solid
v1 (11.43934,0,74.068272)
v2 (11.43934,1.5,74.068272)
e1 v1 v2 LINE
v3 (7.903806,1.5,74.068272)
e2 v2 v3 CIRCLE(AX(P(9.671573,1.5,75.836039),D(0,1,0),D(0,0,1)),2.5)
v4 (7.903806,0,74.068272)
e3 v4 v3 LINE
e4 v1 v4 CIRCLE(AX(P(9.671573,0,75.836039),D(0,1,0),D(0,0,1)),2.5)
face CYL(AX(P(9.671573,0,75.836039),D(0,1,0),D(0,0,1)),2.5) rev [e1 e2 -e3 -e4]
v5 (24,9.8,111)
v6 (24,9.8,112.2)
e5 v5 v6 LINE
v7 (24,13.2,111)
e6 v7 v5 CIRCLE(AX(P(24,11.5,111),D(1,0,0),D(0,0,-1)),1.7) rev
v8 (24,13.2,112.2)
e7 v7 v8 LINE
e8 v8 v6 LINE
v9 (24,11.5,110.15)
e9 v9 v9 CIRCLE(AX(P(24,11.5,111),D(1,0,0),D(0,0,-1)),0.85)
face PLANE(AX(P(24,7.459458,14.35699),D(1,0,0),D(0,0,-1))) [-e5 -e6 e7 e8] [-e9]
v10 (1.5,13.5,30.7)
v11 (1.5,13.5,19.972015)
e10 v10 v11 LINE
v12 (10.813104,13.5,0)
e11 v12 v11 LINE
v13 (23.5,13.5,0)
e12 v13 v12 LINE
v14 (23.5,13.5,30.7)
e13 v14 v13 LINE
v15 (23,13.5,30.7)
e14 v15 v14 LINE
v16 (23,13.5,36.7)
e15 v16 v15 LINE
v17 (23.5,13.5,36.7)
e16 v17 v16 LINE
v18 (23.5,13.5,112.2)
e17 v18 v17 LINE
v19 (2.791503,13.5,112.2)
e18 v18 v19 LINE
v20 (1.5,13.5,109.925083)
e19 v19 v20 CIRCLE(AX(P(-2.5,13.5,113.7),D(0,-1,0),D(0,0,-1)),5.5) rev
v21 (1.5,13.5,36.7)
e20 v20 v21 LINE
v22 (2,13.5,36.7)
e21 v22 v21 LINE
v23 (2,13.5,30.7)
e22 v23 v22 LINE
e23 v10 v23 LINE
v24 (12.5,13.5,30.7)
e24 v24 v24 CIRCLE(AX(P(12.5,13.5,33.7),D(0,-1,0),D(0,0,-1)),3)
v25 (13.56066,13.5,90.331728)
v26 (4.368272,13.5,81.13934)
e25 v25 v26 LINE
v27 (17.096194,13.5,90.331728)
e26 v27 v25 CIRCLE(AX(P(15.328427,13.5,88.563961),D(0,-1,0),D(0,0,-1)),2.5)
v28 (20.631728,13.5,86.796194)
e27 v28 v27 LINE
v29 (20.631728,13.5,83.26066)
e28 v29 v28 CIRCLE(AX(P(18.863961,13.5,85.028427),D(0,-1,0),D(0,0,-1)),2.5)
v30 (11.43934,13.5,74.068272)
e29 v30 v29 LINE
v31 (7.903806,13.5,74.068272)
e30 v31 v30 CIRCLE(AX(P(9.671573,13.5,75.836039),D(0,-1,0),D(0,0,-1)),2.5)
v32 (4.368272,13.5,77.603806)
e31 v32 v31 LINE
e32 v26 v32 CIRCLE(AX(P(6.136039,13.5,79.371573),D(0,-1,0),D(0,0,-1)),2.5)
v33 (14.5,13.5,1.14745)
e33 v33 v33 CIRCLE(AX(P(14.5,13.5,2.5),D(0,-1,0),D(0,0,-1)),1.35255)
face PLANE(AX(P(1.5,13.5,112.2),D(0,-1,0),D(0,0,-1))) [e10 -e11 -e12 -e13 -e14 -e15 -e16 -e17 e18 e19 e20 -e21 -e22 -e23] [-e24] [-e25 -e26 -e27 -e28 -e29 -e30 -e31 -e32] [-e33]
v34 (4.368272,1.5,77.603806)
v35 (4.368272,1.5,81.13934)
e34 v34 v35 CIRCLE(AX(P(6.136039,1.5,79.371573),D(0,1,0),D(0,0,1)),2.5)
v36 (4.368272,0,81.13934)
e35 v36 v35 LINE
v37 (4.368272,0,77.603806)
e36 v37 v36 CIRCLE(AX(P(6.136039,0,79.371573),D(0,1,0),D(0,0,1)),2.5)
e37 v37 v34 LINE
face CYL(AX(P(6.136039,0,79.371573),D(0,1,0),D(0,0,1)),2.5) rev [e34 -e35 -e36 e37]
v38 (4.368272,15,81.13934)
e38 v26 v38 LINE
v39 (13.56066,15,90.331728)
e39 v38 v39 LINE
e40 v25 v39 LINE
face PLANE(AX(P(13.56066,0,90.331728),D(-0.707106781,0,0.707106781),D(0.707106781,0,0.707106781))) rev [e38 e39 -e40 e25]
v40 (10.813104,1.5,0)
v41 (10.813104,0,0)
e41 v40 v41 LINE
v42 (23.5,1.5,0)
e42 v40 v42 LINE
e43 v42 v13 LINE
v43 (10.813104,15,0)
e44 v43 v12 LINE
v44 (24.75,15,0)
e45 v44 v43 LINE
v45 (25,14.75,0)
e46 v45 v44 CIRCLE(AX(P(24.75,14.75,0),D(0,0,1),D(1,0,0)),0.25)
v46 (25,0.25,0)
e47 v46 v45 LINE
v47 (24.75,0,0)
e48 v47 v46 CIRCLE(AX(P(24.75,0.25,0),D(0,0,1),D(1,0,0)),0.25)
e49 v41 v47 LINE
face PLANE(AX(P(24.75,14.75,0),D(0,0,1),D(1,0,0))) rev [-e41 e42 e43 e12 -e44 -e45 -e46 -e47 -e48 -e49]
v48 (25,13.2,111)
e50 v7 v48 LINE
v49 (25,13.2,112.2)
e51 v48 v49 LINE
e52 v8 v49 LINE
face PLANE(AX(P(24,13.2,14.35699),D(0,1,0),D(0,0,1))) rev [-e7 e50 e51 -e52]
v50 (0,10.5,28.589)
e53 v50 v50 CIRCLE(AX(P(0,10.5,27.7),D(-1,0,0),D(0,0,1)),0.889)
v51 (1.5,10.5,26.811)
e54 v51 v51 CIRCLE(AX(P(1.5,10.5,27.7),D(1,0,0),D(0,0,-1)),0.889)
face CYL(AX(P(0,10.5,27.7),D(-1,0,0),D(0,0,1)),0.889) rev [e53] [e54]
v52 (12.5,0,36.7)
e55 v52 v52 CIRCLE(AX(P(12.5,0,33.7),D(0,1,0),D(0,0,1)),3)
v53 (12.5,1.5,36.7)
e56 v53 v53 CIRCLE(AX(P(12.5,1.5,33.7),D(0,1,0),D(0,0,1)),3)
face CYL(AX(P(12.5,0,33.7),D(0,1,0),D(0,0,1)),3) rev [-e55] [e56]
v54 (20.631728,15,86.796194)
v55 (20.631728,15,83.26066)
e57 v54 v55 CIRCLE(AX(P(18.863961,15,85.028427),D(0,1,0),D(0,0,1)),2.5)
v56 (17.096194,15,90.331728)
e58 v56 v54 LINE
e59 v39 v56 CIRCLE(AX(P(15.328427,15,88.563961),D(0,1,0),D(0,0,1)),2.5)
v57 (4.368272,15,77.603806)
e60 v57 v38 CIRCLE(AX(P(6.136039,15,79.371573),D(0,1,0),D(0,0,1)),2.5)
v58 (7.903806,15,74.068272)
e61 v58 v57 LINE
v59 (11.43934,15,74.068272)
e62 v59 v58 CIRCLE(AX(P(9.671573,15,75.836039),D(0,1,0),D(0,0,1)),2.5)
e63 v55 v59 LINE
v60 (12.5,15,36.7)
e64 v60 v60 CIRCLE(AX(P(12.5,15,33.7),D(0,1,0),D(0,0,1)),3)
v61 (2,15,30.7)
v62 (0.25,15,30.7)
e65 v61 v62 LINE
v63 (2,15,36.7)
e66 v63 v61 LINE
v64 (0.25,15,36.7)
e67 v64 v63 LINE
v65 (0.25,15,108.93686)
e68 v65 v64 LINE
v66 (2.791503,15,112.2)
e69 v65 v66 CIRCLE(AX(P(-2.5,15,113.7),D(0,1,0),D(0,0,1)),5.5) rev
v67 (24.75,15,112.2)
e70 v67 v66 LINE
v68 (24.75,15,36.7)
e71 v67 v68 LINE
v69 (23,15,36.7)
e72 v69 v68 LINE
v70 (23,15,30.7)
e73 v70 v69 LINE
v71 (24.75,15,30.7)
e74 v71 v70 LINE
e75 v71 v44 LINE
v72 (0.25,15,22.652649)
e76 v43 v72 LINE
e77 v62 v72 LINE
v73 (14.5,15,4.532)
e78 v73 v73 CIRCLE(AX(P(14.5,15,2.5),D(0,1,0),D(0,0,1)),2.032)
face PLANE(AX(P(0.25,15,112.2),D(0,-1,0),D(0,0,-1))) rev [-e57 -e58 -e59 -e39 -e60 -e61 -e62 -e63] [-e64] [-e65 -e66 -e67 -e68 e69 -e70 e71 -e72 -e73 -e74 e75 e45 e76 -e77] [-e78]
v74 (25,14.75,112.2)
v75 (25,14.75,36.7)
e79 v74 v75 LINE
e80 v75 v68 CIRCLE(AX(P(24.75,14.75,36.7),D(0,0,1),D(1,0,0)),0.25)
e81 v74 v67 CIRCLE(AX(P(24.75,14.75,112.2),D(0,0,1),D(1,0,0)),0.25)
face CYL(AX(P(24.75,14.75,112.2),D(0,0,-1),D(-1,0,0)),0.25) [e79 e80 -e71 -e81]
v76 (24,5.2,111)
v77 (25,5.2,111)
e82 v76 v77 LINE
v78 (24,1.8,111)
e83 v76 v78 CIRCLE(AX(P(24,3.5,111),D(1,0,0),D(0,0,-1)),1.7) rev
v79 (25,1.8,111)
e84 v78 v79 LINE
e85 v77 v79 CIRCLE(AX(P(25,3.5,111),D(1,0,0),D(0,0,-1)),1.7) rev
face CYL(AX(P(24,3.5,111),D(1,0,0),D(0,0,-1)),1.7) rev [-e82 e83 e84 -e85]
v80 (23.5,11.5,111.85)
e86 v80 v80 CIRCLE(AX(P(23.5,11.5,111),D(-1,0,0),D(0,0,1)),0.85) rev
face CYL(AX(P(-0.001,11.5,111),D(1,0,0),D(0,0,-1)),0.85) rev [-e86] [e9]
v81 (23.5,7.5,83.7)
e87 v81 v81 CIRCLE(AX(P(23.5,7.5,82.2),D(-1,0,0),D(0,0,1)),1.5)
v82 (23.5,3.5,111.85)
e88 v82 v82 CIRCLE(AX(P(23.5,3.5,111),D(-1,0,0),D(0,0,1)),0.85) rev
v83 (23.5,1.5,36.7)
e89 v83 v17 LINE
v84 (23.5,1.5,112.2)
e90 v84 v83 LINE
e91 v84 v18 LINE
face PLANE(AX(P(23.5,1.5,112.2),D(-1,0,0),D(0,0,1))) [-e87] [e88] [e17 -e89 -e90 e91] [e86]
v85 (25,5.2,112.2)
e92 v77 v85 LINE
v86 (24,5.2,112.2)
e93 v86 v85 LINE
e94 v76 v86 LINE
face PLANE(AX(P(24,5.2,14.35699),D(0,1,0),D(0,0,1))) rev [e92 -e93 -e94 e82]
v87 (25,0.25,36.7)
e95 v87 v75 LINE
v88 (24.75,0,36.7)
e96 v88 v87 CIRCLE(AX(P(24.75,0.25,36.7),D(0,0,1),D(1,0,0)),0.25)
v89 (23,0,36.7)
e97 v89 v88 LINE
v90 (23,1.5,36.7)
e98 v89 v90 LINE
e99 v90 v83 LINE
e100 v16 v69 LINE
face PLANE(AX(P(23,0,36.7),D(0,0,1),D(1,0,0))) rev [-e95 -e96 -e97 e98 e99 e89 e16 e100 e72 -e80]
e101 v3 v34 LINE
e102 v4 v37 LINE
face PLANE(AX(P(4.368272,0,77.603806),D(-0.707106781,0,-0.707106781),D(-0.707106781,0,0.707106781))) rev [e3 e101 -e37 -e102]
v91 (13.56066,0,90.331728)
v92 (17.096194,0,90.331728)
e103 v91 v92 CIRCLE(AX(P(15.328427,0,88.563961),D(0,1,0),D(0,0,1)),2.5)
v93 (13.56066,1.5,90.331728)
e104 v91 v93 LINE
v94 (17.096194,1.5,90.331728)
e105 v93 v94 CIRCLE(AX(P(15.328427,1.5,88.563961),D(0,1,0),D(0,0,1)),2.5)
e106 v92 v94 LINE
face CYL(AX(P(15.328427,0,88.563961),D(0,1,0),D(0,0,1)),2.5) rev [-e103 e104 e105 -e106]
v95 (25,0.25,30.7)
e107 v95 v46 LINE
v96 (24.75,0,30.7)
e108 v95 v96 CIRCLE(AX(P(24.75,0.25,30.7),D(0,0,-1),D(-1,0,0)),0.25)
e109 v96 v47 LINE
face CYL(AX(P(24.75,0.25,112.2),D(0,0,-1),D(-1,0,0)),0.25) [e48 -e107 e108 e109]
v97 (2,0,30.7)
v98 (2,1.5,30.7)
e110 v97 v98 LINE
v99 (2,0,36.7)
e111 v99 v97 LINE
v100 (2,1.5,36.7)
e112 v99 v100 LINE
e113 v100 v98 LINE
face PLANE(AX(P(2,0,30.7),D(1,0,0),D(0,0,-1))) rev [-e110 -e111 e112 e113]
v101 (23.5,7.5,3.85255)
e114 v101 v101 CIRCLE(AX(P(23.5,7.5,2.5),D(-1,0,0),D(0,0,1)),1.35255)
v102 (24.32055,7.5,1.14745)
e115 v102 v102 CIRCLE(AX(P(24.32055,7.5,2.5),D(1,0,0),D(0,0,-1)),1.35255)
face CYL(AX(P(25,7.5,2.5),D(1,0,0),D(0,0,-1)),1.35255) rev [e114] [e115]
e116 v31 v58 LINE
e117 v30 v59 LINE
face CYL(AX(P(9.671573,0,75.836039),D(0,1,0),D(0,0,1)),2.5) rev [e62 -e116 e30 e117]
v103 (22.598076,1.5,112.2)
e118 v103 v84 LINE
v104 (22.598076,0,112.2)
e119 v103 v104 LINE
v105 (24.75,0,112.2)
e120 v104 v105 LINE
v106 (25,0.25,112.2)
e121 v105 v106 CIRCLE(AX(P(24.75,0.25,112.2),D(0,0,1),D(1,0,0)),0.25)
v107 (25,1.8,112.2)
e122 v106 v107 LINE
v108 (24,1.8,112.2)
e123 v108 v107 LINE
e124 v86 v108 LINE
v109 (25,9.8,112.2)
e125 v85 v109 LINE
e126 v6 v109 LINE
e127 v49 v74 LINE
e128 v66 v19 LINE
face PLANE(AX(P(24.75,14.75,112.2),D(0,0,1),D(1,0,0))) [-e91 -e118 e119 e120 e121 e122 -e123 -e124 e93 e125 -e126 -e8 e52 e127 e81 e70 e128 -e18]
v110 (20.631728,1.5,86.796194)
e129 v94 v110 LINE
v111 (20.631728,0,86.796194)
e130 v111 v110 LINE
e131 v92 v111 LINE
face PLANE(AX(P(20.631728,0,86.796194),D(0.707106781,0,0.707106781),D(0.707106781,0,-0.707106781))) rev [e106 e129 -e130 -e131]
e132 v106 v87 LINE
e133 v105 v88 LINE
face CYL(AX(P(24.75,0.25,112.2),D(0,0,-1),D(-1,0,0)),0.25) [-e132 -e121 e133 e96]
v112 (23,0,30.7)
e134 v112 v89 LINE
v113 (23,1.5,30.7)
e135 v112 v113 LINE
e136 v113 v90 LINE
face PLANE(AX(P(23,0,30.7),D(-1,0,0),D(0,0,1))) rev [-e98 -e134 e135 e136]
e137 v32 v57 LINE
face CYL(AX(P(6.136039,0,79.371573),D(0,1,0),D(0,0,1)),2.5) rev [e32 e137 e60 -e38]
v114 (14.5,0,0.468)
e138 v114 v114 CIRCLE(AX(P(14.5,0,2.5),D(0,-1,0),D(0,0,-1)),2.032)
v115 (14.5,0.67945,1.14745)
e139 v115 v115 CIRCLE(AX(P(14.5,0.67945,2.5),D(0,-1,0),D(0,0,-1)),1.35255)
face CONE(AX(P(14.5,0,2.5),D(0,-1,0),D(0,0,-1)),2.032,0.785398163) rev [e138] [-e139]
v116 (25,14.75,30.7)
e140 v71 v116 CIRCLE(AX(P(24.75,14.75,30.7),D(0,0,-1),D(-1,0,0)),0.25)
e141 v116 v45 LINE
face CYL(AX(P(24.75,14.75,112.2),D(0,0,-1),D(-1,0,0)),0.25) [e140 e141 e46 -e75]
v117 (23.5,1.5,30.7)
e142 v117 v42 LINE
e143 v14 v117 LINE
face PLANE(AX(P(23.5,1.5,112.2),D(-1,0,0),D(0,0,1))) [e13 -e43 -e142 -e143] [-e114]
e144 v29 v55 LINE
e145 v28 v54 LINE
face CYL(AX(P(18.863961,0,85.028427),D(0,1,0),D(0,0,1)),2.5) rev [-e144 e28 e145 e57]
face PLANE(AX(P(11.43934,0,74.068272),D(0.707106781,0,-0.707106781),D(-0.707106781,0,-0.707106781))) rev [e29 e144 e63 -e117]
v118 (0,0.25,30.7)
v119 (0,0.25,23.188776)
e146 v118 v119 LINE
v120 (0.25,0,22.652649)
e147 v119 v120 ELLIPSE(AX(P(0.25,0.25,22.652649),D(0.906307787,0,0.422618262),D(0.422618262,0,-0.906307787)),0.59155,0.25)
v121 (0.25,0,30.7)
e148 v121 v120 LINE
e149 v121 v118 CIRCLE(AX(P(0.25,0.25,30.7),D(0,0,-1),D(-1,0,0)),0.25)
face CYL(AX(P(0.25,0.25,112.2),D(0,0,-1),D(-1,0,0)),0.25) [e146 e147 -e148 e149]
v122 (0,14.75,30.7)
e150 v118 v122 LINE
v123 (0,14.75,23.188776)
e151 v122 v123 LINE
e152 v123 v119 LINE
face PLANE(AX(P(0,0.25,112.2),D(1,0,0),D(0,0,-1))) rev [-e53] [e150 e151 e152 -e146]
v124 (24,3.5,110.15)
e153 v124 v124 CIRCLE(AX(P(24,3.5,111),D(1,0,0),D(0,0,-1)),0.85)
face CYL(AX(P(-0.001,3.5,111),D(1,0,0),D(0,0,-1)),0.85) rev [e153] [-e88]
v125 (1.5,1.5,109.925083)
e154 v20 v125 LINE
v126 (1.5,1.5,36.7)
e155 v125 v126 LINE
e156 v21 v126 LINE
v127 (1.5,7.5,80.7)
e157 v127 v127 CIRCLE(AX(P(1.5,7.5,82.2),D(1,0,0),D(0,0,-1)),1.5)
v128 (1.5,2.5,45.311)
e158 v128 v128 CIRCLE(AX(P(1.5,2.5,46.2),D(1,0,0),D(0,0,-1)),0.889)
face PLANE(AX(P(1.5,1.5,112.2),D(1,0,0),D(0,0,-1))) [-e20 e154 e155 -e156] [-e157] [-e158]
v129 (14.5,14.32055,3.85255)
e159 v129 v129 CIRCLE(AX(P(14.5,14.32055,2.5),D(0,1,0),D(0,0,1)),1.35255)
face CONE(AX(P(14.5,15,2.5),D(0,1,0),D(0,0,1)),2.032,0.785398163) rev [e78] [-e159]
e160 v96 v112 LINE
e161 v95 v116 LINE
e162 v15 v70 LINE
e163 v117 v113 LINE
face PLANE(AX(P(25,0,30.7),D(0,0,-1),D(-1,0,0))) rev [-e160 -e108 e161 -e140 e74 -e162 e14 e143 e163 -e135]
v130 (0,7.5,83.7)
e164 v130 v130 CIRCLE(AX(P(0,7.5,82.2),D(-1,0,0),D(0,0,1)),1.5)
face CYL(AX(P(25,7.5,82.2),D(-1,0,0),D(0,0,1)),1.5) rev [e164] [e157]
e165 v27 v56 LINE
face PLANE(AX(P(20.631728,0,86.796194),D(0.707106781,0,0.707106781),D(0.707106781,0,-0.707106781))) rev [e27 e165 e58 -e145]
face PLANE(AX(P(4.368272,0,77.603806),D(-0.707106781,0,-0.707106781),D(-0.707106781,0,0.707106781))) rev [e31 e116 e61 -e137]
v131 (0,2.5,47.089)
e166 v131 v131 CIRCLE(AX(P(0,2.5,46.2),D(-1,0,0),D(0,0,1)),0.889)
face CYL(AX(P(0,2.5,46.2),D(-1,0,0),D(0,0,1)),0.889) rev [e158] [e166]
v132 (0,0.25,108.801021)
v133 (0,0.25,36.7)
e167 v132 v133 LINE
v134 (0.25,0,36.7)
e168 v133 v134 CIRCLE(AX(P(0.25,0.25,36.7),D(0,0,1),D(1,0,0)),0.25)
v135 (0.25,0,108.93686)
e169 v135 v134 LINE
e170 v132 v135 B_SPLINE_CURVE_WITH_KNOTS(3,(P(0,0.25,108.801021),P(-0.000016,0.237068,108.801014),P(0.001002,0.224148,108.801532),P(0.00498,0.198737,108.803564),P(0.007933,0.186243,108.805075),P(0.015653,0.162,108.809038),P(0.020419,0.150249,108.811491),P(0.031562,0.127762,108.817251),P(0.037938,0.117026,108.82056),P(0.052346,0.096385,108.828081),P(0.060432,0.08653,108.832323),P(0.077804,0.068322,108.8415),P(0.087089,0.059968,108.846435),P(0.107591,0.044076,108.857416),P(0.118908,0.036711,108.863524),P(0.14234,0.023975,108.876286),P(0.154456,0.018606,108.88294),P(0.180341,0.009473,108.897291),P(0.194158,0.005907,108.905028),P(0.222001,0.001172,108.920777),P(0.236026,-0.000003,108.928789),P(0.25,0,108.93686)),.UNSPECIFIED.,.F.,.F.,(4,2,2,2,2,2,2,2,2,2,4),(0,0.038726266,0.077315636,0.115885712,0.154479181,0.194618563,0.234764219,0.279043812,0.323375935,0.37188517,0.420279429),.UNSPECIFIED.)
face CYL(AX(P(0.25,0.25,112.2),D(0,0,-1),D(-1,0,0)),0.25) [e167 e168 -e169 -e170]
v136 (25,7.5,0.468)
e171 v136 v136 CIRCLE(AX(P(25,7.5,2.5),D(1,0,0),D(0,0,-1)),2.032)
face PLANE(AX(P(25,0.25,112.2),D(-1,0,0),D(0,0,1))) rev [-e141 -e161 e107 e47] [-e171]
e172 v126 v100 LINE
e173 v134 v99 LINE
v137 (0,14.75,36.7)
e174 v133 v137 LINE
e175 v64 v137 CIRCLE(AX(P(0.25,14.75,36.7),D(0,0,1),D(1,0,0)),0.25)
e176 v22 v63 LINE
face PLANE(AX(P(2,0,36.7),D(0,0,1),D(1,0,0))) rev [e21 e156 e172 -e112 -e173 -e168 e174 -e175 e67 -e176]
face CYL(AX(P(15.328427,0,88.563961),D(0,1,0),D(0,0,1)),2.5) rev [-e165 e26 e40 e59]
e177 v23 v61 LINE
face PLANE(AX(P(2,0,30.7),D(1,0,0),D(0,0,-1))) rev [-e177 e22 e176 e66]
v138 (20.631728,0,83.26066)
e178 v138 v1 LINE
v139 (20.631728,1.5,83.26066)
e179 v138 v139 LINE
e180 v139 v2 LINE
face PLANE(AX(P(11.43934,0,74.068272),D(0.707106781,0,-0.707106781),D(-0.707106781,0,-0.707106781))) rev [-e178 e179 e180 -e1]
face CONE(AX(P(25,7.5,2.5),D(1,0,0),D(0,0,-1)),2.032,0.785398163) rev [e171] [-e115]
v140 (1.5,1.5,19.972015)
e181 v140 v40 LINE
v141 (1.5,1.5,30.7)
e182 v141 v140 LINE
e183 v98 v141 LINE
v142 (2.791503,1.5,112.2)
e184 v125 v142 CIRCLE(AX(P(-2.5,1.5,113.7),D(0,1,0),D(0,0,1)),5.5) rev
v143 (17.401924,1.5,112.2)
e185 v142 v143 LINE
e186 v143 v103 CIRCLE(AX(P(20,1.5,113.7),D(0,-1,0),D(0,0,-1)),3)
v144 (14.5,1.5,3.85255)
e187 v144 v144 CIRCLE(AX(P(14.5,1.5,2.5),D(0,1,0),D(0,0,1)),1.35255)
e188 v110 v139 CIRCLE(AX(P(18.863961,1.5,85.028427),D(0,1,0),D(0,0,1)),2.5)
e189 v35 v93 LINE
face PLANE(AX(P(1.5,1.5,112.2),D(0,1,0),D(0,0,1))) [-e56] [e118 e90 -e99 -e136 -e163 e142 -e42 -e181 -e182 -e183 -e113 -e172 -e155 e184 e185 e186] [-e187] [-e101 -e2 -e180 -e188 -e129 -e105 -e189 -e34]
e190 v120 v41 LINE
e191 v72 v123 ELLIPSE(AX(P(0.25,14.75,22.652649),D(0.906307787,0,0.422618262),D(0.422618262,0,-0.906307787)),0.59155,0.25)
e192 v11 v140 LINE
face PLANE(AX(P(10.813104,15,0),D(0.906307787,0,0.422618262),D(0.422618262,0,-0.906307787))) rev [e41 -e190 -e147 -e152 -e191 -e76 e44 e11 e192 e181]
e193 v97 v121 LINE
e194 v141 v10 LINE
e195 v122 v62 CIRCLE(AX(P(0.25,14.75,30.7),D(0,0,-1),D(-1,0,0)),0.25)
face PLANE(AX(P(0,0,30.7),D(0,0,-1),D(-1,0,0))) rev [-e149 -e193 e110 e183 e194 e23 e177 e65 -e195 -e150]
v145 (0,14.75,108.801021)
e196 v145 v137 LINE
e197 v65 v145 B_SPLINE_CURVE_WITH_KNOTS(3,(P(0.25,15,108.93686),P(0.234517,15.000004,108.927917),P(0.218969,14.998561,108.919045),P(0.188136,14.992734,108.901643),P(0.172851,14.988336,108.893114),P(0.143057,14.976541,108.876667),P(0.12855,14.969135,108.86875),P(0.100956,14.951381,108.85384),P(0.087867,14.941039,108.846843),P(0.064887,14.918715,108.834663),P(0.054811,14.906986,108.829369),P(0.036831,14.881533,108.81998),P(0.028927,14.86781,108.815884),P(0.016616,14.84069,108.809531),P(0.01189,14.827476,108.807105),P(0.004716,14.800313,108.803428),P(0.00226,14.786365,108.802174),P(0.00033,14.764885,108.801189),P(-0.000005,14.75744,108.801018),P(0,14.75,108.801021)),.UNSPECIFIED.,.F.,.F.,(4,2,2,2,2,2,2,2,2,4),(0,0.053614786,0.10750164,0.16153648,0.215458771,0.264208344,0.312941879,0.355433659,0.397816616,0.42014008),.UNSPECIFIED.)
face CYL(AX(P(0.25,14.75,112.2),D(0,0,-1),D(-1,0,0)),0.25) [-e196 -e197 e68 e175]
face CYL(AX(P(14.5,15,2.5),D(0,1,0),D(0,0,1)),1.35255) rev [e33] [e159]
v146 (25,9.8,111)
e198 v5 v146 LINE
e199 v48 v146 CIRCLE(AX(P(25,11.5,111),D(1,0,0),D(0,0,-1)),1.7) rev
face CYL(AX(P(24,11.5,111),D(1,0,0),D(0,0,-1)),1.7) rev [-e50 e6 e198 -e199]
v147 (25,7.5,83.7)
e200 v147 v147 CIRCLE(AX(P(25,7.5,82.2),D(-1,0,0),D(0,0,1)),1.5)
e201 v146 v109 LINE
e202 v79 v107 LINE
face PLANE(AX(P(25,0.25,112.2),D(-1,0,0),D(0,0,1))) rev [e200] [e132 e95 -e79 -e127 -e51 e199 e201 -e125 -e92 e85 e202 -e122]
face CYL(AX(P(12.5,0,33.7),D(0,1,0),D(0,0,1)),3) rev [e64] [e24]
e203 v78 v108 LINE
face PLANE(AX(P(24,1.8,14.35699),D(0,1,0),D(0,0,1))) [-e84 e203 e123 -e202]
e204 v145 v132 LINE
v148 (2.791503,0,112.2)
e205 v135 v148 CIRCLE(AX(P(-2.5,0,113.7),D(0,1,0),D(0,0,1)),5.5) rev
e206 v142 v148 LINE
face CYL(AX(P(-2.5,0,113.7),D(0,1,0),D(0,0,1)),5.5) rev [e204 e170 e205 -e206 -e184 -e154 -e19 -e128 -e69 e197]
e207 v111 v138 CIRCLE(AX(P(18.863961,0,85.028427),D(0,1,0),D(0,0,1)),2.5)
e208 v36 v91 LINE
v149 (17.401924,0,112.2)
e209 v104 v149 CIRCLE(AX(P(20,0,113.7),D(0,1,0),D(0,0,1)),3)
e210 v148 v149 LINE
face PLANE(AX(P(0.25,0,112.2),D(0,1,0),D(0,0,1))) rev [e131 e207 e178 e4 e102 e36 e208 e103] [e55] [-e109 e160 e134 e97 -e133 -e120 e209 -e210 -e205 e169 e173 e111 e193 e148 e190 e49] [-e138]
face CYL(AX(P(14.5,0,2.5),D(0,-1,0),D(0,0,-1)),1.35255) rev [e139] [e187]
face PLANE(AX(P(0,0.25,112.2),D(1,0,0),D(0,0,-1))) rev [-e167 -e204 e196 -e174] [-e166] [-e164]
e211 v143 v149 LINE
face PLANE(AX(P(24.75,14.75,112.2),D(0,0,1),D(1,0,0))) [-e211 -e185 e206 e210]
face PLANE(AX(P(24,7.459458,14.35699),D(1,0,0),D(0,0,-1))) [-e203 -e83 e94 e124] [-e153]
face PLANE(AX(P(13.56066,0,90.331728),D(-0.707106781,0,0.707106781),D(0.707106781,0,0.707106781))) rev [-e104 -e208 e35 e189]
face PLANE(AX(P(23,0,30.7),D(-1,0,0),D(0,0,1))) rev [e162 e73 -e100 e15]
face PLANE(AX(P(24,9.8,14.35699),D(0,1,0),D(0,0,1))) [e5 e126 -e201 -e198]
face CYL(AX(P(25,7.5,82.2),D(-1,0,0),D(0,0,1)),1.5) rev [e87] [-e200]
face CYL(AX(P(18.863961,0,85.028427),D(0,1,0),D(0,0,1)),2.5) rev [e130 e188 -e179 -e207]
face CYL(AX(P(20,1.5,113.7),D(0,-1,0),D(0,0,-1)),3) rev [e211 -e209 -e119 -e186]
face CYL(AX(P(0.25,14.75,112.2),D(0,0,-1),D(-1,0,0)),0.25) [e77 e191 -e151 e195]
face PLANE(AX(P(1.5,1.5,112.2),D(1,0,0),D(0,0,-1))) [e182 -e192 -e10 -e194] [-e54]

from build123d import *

# Parameters (mm, degrees)
SKETCH_1_W              = 22
SKETCH_1_H              = 12
EXTRUDE_1_DEPTH         = 112.2
SKETCH_2_R              = 3
SKETCH_2_W              = 2
SKETCH_2_H              = 6
CUT_EXTRUDE_1_DEPTH     = 116.926010886
SKETCH_3_R              = 1.5
CUT_EXTRUDE_2_DEPTH     = 116.926010886
CUT_EXTRUDE_5_DEPTH     = 116.926010886
HOLE_WIZARD_2_561_D     = 1.778
HOLE_WIZARD_2_561_DEPTH = 1.5
CUT_EXTRUDE_7_DEPTH     = 116.926010886
CUT_EXTRUDE_8_REACH     = 117.926
SKETCH_13_R             = 0.85
CUT_EXTRUDE_START       = 24
CUT_EXTRUDE_9_OUTLINE_R = 0.85
CUT_EXTRUDE_9_DEPTH     = 1
CUT_EXTRUDE_10_DEPTH    = 116.74147918


# Read off the part's stored shape, not the designer's step: Вырез-Вытянуть9
with BuildPart() as part:
    # Эскиз1 → Вытянуть1 (new body)
    with BuildSketch(Plane.XY):
        with BuildLine():
            Line((0.25, 0), (24.75, 0))
            ThreePointArc((24.75, 0), (24.926776695, 0.073223305), (25, 0.25))
            Line((25, 0.25), (25, 14.75))
            ThreePointArc((25, 14.75), (24.926776695, 14.926776695), (24.75, 15))
            Line((24.75, 15), (0.25, 15))
            ThreePointArc((0.25, 15), (0.073223305, 14.926776695), (0, 14.75))
            Line((0, 14.75), (0, 0.25))
            ThreePointArc((0, 0.25), (0.073223305, 0.073223305), (0.25, 0))
        make_face()
        with Locations((12.5, 7.5)):
            Rectangle(SKETCH_1_W, SKETCH_1_H, mode=Mode.SUBTRACT)
    extrude(amount=EXTRUDE_1_DEPTH)

    # Эскиз2 → Вырез-Вытянуть1 (cut, through all)
    with BuildSketch(Plane(origin=(0, 15, 0), x_dir=(1, 0, 0), z_dir=(0, 1, 0))):
        with Locations(Location((12.5, -33.7, 0), (0, 0, 270))):
            Circle(SKETCH_2_R)
        with BuildLine():
            Line((13.560660172, -90.331727984), (4.368272016, -81.139339828))
            ThreePointArc((4.368272016, -81.139339828), (3.636038969, -79.371572875), (4.368272016, -77.603805922))
            Line((4.368272016, -77.603805922), (7.903805922, -74.068272016))
            ThreePointArc((7.903805922, -74.068272016), (9.671572875, -73.336038969), (11.439339828, -74.068272016))
            Line((11.439339828, -74.068272016), (20.631727984, -83.260660172))
            ThreePointArc((20.631727984, -83.260660172), (21.363961031, -85.028427125), (20.631727984, -86.796194078))
            Line((20.631727984, -86.796194078), (17.096194078, -90.331727984))
            ThreePointArc((17.096194078, -90.331727984), (15.328427125, -91.063961031), (13.560660172, -90.331727984))
        make_face()
        with Locations((1, -33.7)):
            Rectangle(SKETCH_2_W, SKETCH_2_H)
        with Locations((24, -33.7)):
            Rectangle(SKETCH_2_W, SKETCH_2_H)
    extrude(amount=-CUT_EXTRUDE_1_DEPTH, mode=Mode.SUBTRACT)

    # Эскиз3 → Вырез-Вытянуть2 (cut, through all)
    with BuildSketch(Plane.ZY):
        with Locations((82.2, 7.5)):
            Circle(SKETCH_3_R)
    extrude(amount=-CUT_EXTRUDE_2_DEPTH, mode=Mode.SUBTRACT)

    # Эскиз6 → Вырез-Вытянуть5 (cut, through all)
    with BuildSketch(Plane(origin=(0, 15, 0), x_dir=(1, 0, 0), z_dir=(0, 1, 0))):
        Polygon((110.629924484, 214.057863156), (10.813103606, 0), (0, -23.188775515), (-99.816820878, -237.246638671), (-527.932547189, -37.612996915), (-317.485801828, 413.691504911), align=None)
    extrude(amount=-CUT_EXTRUDE_5_DEPTH, mode=Mode.SUBTRACT)

    # Эскиз8 → Зенковка для  винта с плоской головкой #2(100)2 (revolve, cut)
    with BuildSketch(Plane(origin=(14.5, 15, 2.5), x_dir=(0, 0, 1), z_dir=(1, 0, 0))):
        Polygon((0, 0), (0, 1.5), (1.35255, 1.5), (1.35255, 0.67945), (2.032, 0), align=None)
    revolve(axis=Axis((14.5, 21.35, 2.5), (0, -1, 0)), mode=Mode.SUBTRACT)

    # Эскиз8 at point 2 (carried to point 2, square into its face) → Зенковка для  винта с плоской головкой #2(100)2 at 2 (revolve, cut)
    with BuildSketch(Plane(origin=(14.5, 0, 2.5), x_dir=(0, 0, 1), z_dir=(-1, 0, 0))):
        Polygon((0, 0), (0, 1.5), (1.35255, 1.5), (1.35255, 0.67945), (2.032, 0), align=None)
    revolve(axis=Axis((14.5, -6.35, 2.5), (0, 1, 0)), mode=Mode.SUBTRACT)

    # Эскиз8 at point 3 (carried to point 3, square into its face) → Зенковка для  винта с плоской головкой #2(100)2 at 3 (revolve, cut)
    with BuildSketch(Plane(origin=(25, 7.5, 2.5), x_dir=(0, 0, 1), z_dir=(0, -1, 0))):
        Polygon((0, 0), (0, 1.5), (1.35255, 1.5), (1.35255, 0.67945), (2.032, 0), align=None)
    revolve(axis=Axis((31.35, 7.5, 2.5), (-1, 0, 0)), mode=Mode.SUBTRACT)

    # Отверстие обработанное метчиком #2-561
    with Locations(Plane.ZY):
        with Locations((27.7, 10.5), (46.2, 2.5)):
            Hole(HOLE_WIZARD_2_561_D / 2, depth=HOLE_WIZARD_2_561_DEPTH)

    # Эскиз12 → Вырез-Вытянуть7 (cut, through all)
    with BuildSketch(Plane.XZ.offset(-15)):
        with BuildLine():
            ThreePointArc((2.791502622, 112.2), (2.947626291, 112.942789468), (3, 113.7))
            ThreePointArc((3, 113.7), (-7.263139721, 116.45), (0.25, 108.936860279))
            Line((0.25, 108.936860279), (0.25, 112.2))
            Line((0.25, 112.2), (2.791502622, 112.2))
        make_face()
        with BuildLine():
            Line((0.25, 112.2), (0.25, 108.936860279))
            ThreePointArc((0.25, 108.936860279), (1.839177493, 110.320423298), (2.791502622, 112.2))
            Line((2.791502622, 112.2), (0.25, 112.2))
        make_face()
    extrude(amount=CUT_EXTRUDE_7_DEPTH, mode=Mode.SUBTRACT)

    # Эскиз13 → Вырез-Вытянуть8 (cut, up to next)
    with BuildSketch(Plane(origin=(25, 0, 0), x_dir=(0, 0, -1), z_dir=(1, 0, 0)), mode=Mode.PRIVATE) as cut_extrude_8_sk1:
        with Locations((-111, 11.5)):
            Circle(SKETCH_13_R)
    cut_extrude_8_tool1 = extrude(cut_extrude_8_sk1.sketch, amount=-CUT_EXTRUDE_8_REACH, mode=Mode.PRIVATE) & part.part
    # Эскиз13 → Вырез-Вытянуть8 (cut, up to next)
    with BuildSketch(Plane(origin=(25, 0, 0), x_dir=(0, 0, -1), z_dir=(1, 0, 0)), mode=Mode.PRIVATE) as cut_extrude_8_sk2:
        with Locations((-111, 3.5)):
            Circle(SKETCH_13_R)
    cut_extrude_8_tool2 = extrude(cut_extrude_8_sk2.sketch, amount=-CUT_EXTRUDE_8_REACH, mode=Mode.PRIVATE) & part.part
    add(cut_extrude_8_tool1.solids().sort_by_distance((25, 11.5, 111))[0], mode=Mode.SUBTRACT)
    add(cut_extrude_8_tool2.solids().sort_by_distance((25, 3.5, 111))[0], mode=Mode.SUBTRACT)

    # Вырез-Вытянуть9 outline → Вырез-Вытянуть9 (cut)
    # profile 1 of 2: a face of its own
    with BuildSketch(Plane.YZ.offset(CUT_EXTRUDE_START)):
        with BuildLine():
            Line((1.8, 112.2), (1.8, 111))
            ThreePointArc((1.8, 111), (3.5, 109.3), (5.2, 111))
            Line((5.2, 111), (5.2, 112.2))
            Line((5.2, 112.2), (1.8, 112.2))
        make_face()
        with Locations((3.5, 111)):
            Circle(CUT_EXTRUDE_9_OUTLINE_R, mode=Mode.SUBTRACT)
    # profile 2 of 2: a face of its own
    with BuildSketch(Plane.YZ.offset(CUT_EXTRUDE_START)):
        with BuildLine():
            Line((13.2, 112.2), (9.8, 112.2))
            Line((9.8, 112.2), (9.8, 111))
            ThreePointArc((9.8, 111), (11.5, 109.3), (13.2, 111))
            Line((13.2, 111), (13.2, 112.2))
        make_face()
        with Locations((11.5, 111)):
            Circle(CUT_EXTRUDE_9_OUTLINE_R, mode=Mode.SUBTRACT)
    extrude(amount=CUT_EXTRUDE_9_DEPTH, mode=Mode.SUBTRACT)

    # Эскиз14 → Вырез-Вытянуть10 (cut, through all)
    with BuildSketch(Plane(origin=(0, 1.5, 0), x_dir=(1, 0, 0), z_dir=(0, 1, 0))):
        with BuildLine():
            Line((-102.051180376, -319.098845535), (17.401923789, -112.2))
            ThreePointArc((17.401923789, -112.2), (20, -110.7), (22.598076211, -112.2))
            Line((22.598076211, -112.2), (142.051180376, -319.098845535))
            Line((142.051180376, -319.098845535), (142.051180376, -796.911262195))
            Line((142.051180376, -796.911262195), (-102.051180376, -796.911262195))
            Line((-102.051180376, -796.911262195), (-102.051180376, -319.098845535))
        make_face()
    extrude(amount=-CUT_EXTRUDE_10_DEPTH, mode=Mode.SUBTRACT)


solid = part.part
